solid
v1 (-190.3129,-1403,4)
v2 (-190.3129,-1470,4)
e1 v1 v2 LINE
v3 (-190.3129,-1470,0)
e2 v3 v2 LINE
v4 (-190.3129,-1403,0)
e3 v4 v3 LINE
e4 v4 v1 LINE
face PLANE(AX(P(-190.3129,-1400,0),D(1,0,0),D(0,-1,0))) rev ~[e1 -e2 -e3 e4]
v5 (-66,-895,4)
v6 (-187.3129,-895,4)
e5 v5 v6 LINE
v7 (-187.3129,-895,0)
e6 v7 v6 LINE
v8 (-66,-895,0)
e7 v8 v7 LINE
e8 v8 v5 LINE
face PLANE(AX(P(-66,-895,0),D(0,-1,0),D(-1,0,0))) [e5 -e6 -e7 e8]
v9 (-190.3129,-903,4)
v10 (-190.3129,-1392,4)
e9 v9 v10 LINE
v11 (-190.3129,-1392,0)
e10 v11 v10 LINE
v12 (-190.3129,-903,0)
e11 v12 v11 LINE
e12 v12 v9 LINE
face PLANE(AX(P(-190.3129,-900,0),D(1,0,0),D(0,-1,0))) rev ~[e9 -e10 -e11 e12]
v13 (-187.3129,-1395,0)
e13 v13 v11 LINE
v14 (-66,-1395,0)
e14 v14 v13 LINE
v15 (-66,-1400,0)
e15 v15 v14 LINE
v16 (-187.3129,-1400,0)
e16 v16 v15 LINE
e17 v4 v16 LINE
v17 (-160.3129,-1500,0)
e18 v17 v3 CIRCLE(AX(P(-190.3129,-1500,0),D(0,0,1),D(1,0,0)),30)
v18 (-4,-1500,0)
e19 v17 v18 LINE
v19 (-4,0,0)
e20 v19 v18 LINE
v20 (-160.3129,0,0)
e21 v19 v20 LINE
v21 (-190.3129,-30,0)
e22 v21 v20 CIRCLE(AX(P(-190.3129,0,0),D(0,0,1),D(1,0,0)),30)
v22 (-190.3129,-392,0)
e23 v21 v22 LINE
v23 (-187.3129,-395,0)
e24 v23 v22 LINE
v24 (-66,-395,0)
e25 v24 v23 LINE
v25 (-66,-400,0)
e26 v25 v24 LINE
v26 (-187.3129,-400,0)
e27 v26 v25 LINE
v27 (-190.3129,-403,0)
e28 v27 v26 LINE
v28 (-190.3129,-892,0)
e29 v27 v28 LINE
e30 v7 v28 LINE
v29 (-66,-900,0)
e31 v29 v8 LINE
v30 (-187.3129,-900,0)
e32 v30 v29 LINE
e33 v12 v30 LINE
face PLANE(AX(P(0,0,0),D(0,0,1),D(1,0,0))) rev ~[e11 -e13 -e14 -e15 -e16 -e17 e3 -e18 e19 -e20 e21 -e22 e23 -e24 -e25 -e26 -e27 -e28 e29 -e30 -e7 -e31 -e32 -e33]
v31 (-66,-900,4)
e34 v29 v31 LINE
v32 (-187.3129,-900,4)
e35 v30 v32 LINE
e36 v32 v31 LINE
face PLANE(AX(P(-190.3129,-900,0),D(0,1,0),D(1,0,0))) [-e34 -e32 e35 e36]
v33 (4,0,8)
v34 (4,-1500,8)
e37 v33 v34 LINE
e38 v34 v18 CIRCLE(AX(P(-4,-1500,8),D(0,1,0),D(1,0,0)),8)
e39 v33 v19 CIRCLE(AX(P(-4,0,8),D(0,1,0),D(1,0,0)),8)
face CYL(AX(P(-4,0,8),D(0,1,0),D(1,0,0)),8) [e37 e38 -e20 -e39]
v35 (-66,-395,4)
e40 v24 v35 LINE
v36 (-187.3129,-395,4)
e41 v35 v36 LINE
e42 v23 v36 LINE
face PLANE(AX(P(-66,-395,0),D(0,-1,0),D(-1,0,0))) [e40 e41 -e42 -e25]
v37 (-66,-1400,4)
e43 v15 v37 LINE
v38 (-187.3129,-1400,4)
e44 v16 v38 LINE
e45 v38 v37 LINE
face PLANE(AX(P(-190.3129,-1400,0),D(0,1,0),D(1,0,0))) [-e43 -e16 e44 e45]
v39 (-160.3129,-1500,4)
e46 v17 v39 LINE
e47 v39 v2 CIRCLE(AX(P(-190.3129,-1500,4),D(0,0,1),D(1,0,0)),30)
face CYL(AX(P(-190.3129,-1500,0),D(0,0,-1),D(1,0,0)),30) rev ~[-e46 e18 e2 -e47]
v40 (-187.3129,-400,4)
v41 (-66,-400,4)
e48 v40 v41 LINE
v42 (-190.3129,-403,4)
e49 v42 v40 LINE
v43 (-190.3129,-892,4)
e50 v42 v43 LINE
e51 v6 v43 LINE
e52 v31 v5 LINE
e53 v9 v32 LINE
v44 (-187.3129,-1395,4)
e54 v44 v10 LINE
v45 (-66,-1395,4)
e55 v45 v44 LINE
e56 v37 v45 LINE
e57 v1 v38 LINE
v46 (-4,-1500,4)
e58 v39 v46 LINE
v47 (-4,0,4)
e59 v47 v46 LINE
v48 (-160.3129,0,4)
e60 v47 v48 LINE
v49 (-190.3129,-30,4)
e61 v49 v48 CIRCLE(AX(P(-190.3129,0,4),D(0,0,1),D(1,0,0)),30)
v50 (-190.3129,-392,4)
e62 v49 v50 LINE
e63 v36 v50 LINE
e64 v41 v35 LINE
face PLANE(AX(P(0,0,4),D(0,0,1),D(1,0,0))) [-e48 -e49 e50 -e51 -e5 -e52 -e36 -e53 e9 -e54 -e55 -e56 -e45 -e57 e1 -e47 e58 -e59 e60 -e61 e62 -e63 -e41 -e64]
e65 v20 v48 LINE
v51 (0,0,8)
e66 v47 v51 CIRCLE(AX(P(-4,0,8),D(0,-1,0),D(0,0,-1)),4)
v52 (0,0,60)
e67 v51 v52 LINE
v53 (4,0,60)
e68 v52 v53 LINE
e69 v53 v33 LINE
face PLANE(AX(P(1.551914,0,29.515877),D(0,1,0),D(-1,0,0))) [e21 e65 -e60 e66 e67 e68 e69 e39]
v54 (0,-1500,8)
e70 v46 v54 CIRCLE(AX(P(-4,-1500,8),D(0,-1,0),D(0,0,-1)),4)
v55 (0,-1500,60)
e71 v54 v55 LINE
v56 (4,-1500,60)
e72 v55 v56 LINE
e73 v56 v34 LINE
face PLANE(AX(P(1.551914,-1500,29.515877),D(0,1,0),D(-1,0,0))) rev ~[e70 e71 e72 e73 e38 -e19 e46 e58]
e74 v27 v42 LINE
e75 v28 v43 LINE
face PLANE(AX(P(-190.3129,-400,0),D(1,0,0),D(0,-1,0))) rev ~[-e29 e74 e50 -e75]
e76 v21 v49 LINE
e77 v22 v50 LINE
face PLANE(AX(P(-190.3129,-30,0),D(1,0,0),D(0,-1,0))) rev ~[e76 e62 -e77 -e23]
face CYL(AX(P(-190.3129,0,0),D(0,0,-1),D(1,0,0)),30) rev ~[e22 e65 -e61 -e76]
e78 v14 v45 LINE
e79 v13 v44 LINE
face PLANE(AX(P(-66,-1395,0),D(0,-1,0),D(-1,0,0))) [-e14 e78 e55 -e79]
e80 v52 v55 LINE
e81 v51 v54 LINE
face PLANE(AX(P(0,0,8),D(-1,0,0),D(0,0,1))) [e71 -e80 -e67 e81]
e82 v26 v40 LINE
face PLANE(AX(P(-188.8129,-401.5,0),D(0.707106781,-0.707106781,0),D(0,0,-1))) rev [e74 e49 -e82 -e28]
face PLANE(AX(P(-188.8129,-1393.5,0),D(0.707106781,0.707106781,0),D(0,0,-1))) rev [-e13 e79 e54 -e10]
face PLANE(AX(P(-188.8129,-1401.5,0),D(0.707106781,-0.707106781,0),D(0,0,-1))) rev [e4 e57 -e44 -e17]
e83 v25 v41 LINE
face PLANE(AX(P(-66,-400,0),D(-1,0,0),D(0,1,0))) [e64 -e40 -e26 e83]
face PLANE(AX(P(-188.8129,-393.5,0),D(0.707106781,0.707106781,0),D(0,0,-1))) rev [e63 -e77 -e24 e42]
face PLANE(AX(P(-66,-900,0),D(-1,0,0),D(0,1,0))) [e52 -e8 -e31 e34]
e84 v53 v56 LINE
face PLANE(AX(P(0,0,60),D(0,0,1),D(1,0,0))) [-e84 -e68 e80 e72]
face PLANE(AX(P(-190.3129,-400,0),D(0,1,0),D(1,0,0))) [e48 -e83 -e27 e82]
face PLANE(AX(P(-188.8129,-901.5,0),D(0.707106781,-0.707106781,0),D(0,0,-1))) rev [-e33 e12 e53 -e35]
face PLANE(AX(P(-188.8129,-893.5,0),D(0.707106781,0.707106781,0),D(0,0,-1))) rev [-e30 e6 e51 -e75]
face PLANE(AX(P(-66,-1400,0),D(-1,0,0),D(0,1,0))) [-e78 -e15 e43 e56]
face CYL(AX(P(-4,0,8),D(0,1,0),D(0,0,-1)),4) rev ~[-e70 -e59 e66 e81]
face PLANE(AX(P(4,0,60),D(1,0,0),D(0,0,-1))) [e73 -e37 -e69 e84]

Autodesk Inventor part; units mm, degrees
ref_plane "YZ Plane" through (0, 0, 0) normal (1, 0, 0) x (0, 1, 0)
ref_plane "XZ Plane" through (0, 0, 0) normal (0, 1, 0) x (-1, 0, 0)
ref_plane "XY Plane" through (0, 0, 0) normal (0, 0, 1) x (1, 0, 0)
sketch "Sketch1" plane through (0, 0, 0) normal (0, 0, 1) x (1, 0, 0)
  line L0 (0, 0) -> (-190.3129, 0)
  line L1 (-190.3129, 0) -> (-190.3129, -1500)
  line L2 (-190.3129, -1500) -> (0, -1500)
  line L3 (0, -1500) -> (0, 0)
  line L4 (-190.3129, -1400) -> (-66, -1400)
  line L5 (-66, -1400) -> (-66, -1395)
  line L6 (-66, -1395) -> (-190.3129, -1395)
  line L7 (-190.3129, -1395) -> (-190.3129, -1400)
  line L8 (-190.3129, -900) -> (-66, -900)
  line L9 (-66, -900) -> (-66, -895)
  line L10 (-66, -895) -> (-190.3129, -895)
  line L11 (-190.3129, -895) -> (-190.3129, -900)
  line L12 (-190.3129, -400) -> (-66, -400)
  line L13 (-66, -400) -> (-66, -395)
  line L14 (-66, -395) -> (-190.3129, -395)
  line L15 (-190.3129, -395) -> (-190.3129, -400)
  circle A0 centre (-190.3129, 0) radius 30
  circle A1 centre (-190.3129, -1500) radius 30
  point P0 (-190.3129, -395)
  point P1 (-190.3129, -400)
  point P2 (-190.3129, -1395)
  point P3 (-160.3129, 0)
  point P4 (-190.3129, -30)
  point P5 (-190.3129, -1470)
  point P6 (-160.3129, -1500)
  dimension "d0" = 1500
  dimension "d1" = 190.3129
  dimension "d2" = 5
  dimension "d4" = 100
  dimension "d7" = 500
  dimension "d23" = 66
  dimension "d24" = 60
extrude "Plate1" add sketch "Sketch1" along normal blind 4 contours L3 L2 A1 L1 L4 L5 L6 L8 L9 L10 L12 L13 L14 A0 L0
sketch "Sketch2" plane through (4, 0, 0) normal (-1, 0, 0) x (0, -1, 0)
  line L0 (1500, 0) -> (0, 0)
  line L1 (0, 0) -> (0, 60)
  line L2 (0, 60) -> (1500, 60)
  line L3 (1500, 60) -> (1500, 0)
edge flange "Flange1" height 60 angle 90 thickness 4 bend radius 4 thickness toward (-1, 0, 0) relief tear relief width 4 relief depth 2 edges at (0, -750, 4) wall of the first edge with corners at (4, -1500, 0) (4, 0, 0) (4, 0, 60) (4, -1500, 60)
bend "Bend1"
corner "Corner1"
chamfer "Corner Chamfer1" distance 3 angle 45 6 edges at (-190.3129, -1400, 2) (-190.3129, -1395, 2) (-190.3129, -900, 2) (-190.3129, -895, 2) (-190.3129, -395, 2) (-190.3129, -400, 2)
equation "\"d1\" = стрингер_глубина_1"
equation "\"d2\" = паз_под_стрингер_толщина"
equation "\"d23\" = паз_под_стрингер_глубина - Thickness"
equation "\"d24\" = 2 * радиус_выреза_под_сварку"
equation "\"d12\" = Thickness"
equation "\"d13\" = BendReliefWidth"
equation "\"d14\" = BendReliefDepth"
equation "\"d15\" = MinimumRemnant"
equation "\"d16\" = TransitionRadius"
equation "\"d17\" = ребро_усилителей"
equation "\"d19\" = BendRadius"
equation "\"d20\" = CornerReliefSize"
equation "\"d21\" = GapSize"
equation "\"d22\" = JacobiRadiusSize"
equation "\"BendRadius\" = Thickness"
equation "\"BendReliefWidth\" = Thickness"
equation "\"BendReliefDepth\" = 0.5 * Thickness"
equation "\"CornerReliefSize\" = 4 * Thickness"
equation "\"MinimumRemnant\" = 2 * Thickness"
equation "\"TransitionRadius\" = BendRadius"
equation "\"JacobiRadiusSize\" = BendRadius"
equation "\"GapSize\" = Thickness"
equation "\"стрингер_глубина_1\" = 190.312858"
equation "\"паз_под_стрингер_толщина\" = 5"
equation "\"паз_под_стрингер_глубина\" = 70"
equation "\"Thickness\" = 4"
equation "\"радиус_выреза_под_сварку\" = 30"
equation "\"ребро_усилителей\" = 60"
properties part number "01.3 GBK stringer 1" material "Steel"
